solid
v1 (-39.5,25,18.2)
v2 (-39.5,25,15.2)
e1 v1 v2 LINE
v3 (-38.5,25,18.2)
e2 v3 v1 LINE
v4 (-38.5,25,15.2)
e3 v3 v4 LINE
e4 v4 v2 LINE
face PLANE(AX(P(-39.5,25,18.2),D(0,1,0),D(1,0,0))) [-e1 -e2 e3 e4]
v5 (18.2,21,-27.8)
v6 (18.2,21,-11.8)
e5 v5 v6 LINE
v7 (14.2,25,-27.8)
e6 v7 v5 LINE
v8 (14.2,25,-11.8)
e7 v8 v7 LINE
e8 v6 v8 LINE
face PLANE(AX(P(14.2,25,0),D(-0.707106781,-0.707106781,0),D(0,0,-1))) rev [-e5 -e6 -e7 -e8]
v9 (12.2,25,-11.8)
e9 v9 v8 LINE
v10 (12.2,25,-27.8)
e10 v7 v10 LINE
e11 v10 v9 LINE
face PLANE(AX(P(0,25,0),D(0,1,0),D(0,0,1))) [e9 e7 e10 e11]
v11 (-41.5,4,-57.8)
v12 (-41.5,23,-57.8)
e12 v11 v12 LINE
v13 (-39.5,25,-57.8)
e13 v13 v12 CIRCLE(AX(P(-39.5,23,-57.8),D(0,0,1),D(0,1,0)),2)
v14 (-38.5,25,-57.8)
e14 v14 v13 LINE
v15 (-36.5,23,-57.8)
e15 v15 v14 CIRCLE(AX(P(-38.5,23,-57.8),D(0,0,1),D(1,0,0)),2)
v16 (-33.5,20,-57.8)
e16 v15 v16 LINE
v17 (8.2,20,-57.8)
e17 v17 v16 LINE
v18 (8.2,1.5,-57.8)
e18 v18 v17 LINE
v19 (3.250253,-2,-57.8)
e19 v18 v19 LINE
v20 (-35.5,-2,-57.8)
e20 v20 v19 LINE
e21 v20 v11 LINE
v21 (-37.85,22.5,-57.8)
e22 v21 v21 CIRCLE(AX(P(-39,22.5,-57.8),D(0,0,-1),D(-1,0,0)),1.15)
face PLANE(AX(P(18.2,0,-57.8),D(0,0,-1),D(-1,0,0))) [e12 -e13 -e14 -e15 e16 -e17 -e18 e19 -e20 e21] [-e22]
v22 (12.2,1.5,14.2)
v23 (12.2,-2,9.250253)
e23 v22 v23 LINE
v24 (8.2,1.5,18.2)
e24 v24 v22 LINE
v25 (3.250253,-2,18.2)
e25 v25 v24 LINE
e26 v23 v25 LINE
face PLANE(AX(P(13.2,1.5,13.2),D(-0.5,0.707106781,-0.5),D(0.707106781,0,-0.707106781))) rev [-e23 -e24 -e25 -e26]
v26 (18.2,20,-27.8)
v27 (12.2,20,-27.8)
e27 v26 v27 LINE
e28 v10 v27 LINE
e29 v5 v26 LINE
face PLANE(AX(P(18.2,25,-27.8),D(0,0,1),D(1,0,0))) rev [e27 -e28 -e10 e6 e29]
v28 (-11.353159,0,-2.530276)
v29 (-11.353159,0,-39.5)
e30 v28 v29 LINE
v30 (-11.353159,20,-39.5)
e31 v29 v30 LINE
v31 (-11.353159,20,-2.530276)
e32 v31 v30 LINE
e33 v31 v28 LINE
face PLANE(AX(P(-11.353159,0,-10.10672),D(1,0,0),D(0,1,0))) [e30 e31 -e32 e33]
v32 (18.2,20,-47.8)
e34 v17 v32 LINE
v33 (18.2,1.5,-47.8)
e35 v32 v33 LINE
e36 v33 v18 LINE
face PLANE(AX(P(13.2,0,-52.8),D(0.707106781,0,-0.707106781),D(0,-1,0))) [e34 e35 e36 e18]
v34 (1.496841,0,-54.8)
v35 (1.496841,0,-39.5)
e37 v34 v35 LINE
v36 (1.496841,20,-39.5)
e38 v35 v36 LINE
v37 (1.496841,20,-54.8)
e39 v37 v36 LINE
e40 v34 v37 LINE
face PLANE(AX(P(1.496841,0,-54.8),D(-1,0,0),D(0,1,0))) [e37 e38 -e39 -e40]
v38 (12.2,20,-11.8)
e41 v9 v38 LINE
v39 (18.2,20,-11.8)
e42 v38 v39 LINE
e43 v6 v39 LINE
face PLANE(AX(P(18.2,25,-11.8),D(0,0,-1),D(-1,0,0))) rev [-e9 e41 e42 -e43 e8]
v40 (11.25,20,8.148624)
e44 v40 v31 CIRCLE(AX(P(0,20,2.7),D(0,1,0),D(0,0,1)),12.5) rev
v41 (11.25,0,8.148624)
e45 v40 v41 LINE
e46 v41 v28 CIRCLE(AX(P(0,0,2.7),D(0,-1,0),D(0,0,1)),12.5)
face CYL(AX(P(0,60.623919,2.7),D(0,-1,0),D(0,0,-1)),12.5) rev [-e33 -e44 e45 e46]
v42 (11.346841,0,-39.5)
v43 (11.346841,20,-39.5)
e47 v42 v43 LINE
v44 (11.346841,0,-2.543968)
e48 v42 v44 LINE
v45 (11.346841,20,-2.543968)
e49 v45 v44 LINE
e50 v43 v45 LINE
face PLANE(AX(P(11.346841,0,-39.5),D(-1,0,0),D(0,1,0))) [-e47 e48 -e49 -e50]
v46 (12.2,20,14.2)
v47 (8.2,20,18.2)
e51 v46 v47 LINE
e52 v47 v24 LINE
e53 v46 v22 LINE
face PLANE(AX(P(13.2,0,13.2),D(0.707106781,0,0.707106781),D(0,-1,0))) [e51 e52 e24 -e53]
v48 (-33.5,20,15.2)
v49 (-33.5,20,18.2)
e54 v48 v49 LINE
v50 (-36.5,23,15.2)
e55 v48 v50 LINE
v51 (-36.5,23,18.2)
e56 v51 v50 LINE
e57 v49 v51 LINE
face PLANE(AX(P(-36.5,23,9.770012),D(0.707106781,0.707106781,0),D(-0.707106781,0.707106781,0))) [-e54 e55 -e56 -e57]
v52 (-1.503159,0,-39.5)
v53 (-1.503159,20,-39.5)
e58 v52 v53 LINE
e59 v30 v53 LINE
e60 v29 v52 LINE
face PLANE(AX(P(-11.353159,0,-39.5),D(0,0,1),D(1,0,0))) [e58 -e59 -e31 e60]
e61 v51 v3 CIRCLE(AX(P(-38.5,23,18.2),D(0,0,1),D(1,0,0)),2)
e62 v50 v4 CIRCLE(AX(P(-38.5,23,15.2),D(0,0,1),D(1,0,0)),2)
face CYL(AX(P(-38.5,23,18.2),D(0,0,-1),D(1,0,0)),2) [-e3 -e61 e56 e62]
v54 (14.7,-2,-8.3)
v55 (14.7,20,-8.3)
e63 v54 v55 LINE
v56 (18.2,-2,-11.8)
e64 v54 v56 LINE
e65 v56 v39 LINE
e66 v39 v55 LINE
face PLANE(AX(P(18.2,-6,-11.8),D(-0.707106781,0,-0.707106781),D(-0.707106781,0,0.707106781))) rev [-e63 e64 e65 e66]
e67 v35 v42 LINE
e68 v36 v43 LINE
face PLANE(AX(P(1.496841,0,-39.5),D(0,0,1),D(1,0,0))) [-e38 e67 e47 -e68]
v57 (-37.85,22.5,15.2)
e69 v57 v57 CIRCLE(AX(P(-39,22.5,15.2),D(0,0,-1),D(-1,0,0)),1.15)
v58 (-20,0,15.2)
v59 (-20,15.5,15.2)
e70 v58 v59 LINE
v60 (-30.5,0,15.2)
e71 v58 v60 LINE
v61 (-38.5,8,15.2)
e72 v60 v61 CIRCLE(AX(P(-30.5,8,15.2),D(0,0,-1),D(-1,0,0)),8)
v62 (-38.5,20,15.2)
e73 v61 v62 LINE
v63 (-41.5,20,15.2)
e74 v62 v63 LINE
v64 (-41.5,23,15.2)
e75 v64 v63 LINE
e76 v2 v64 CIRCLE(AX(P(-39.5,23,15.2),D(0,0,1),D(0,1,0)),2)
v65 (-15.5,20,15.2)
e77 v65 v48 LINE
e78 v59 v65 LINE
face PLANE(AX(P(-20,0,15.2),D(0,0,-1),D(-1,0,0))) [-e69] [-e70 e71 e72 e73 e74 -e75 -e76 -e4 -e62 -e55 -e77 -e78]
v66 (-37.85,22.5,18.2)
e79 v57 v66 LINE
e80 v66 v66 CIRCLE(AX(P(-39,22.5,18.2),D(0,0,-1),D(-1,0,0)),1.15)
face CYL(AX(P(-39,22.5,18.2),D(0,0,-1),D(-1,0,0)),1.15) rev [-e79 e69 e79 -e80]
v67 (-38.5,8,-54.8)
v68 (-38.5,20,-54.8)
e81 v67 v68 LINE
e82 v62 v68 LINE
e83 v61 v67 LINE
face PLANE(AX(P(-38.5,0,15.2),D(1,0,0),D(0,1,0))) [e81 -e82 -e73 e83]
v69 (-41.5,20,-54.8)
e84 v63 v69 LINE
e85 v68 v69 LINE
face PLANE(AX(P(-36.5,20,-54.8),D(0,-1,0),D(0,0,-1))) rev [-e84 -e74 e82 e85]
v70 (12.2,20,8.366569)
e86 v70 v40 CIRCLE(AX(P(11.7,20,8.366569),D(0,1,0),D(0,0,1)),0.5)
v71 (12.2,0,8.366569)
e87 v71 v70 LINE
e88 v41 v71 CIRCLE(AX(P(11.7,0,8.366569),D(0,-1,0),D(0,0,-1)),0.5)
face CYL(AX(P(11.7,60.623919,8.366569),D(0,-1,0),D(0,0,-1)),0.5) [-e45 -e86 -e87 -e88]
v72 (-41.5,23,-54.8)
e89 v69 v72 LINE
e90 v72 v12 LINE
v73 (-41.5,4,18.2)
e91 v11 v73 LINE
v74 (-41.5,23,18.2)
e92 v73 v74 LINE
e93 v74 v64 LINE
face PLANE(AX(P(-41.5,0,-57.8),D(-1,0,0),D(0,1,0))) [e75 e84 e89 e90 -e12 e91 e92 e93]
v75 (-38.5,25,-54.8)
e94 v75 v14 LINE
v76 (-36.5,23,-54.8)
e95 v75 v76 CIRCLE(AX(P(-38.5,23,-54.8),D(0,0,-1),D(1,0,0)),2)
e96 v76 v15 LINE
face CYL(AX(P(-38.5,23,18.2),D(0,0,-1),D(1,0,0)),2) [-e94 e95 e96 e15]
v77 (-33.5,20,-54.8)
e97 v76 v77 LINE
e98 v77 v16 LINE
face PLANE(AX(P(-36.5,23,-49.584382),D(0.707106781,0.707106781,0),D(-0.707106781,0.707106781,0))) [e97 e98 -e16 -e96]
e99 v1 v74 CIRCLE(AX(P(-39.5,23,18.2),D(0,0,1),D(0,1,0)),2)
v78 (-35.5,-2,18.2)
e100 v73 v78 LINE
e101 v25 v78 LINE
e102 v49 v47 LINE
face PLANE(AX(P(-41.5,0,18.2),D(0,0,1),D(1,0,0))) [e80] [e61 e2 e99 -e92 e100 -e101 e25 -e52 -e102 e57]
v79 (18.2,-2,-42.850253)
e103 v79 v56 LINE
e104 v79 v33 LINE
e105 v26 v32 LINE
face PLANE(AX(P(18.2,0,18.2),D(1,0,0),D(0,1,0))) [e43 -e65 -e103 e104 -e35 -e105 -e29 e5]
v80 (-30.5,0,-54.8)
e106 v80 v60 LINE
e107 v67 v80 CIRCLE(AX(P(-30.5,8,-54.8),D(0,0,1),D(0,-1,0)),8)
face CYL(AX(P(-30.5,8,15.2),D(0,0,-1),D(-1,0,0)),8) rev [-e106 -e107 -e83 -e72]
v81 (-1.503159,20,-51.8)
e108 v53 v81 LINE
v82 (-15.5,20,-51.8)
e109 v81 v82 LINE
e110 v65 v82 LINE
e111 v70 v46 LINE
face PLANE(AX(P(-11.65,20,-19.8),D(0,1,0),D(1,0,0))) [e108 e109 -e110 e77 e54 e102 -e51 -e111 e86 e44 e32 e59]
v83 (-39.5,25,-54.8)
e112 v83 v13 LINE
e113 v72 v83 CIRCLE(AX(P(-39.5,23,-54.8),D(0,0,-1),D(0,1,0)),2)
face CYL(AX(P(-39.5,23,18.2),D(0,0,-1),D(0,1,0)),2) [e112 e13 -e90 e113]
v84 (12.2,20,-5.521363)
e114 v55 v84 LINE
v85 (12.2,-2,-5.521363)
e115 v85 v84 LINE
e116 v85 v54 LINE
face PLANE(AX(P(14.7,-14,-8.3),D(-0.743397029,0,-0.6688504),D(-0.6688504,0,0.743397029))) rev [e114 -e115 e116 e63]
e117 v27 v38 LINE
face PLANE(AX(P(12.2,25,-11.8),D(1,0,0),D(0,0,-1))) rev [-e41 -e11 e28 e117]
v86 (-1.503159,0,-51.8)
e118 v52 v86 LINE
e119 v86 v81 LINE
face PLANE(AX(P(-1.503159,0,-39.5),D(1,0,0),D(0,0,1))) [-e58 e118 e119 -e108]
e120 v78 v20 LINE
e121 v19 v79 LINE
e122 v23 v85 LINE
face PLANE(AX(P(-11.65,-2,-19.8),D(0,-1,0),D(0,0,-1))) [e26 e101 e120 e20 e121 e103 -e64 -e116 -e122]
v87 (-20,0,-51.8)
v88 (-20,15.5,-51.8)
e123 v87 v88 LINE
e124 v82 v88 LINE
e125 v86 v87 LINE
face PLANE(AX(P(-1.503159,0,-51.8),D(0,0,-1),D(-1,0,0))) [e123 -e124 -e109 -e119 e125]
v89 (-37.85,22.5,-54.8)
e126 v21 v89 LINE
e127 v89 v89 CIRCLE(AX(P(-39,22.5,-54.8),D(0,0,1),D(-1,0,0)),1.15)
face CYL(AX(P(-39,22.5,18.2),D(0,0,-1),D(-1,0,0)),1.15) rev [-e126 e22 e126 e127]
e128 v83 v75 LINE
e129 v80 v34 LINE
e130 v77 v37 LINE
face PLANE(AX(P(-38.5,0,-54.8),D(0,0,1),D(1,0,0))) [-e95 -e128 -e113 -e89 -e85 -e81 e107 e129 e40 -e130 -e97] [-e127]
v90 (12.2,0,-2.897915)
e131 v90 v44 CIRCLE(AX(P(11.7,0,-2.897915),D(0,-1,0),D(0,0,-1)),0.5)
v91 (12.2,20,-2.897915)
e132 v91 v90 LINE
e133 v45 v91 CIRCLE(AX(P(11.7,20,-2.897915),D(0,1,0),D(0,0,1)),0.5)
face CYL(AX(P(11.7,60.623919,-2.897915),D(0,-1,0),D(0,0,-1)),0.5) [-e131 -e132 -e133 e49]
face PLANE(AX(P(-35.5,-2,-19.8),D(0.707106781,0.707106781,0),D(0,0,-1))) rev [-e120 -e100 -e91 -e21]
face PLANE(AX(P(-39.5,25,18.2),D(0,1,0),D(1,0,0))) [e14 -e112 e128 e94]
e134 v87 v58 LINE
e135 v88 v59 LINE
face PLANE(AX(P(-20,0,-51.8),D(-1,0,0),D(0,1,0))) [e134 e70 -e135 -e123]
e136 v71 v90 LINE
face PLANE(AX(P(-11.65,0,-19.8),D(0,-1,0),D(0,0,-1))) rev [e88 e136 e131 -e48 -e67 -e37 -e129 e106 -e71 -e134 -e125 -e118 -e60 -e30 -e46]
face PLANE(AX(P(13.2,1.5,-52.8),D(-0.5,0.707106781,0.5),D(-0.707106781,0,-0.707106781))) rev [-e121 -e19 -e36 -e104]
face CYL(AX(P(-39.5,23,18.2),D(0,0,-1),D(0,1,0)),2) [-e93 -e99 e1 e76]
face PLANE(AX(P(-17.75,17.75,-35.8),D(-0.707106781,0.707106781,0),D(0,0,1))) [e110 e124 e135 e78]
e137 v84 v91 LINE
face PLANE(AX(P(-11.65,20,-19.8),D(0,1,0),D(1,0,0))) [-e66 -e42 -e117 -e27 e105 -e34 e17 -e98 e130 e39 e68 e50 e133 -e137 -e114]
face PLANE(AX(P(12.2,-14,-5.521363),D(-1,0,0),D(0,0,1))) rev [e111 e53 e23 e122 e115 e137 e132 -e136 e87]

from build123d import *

# Parameters (mm, degrees)
BOSS_EXTRUDE1_START       = 10
SKETCH1_R                 = 1.15
BOSS_EXTRUDE1_DEPTH       = 76
SKETCH2_W                 = 6
SKETCH2_H                 = 16.4
CUT_EXTRUDE1_DEPTH        = 76
BOSS_EXTRUDE2_START       = -47.8
BOSS_EXTRUDE2_DEPTH       = 37.686187853
BOSS_EXTRUDE2_START_2     = -51.8
BOSS_EXTRUDE2_2_OUTLINE_W = 9.85
BOSS_EXTRUDE2_2_OUTLINE_H = 20
BOSS_EXTRUDE2_2_DEPTH     = 12.300000091
BOSS_EXTRUDE2_START_3     = -57.8
BOSS_EXTRUDE2_3_OUTLINE_R = 1.15
BOSS_EXTRUDE2_3_DEPTH     = 3
BOSS_EXTRUDE2_START_4     = 15.2
BOSS_EXTRUDE2_4_OUTLINE_R = 1.15
BOSS_EXTRUDE2_4_DEPTH     = 3
BOSS_EXTRUDE2_START_5     = -27.8
BOSS_EXTRUDE2_5_OUTLINE_W = 6
BOSS_EXTRUDE2_5_OUTLINE_H = 5
BOSS_EXTRUDE2_5_DEPTH     = 16
BOSS_EXTRUDE2_START_6     = -11.8
BOSS_EXTRUDE2_6_DEPTH     = 1.69328026
BOSS_EXTRUDE2_START_7     = -2
BOSS_EXTRUDE2_7_OUTLINE_W = 3
BOSS_EXTRUDE2_7_OUTLINE_H = 10
BOSS_EXTRUDE2_7_DEPTH     = 22
BOSS_EXTRUDE2_8_DEPTH     = 2
BOSS_EXTRUDE2_START_8     = -39.951533137
BOSS_EXTRUDE2_9_OUTLINE_W = 10
BOSS_EXTRUDE2_9_OUTLINE_H = 25.30671974
BOSS_EXTRUDE2_9_DEPTH     = 14.849242405
CHAMFER1_SIZE             = 10
CHAMFER2_SIZE             = 4
CHAMFER3_SIZE             = 4
SKETCH4_W                 = 5
SKETCH4_H                 = 3.2
CUT_EXTRUDE2_DEPTH        = 17
SKETCH5_W                 = 92.220715814
SKETCH5_H                 = 108.753281114
CUT_EXTRUDE3_DEPTH        = 17
BOSS_EXTRUDE3_DEPTH       = 3
BOSS_EXTRUDE4_DEPTH       = 3
CUT_EXTRUDE5_DEPTH        = 26
FILLET1_R                 = 0.5
FILLET2_R                 = 8
CHAMFER4_SIZE             = 6
CHAMFER6_SIZE             = 3.5
BOSS_EXTRUDE6_DEPTH       = 20
CUT_EXTRUDE10_DEPTH       = 34
SKETCH14_W                = 6.88450438
SKETCH14_H                = 12.178080633
CUT_EXTRUDE11_DEPTH       = 5
FILLET3_R                 = 0.5


with BuildPart() as part:
    # Sketch1 → Boss-Extrude1 (new body)
    with BuildSketch(Plane(origin=(0, 0, -57.8), x_dir=(-1, 0, 0), z_dir=(0, 0, -1)).offset(BOSS_EXTRUDE1_START)):
        with BuildLine():
            Line((39, 25), (-18.2, 25))
            Line((-18.2, 25), (-18.2, 20))
            Line((-18.2, 20), (39, 20))
            ThreePointArc((39, 20), (41.5, 22.5), (39, 25))
        make_face()
        with Locations((39, 22.5)):
            Circle(SKETCH1_R, mode=Mode.SUBTRACT)
    extrude(amount=BOSS_EXTRUDE1_DEPTH)

    # Sketch2 → Cut-Extrude1 (cut)
    with BuildSketch(Plane(origin=(0, 25, 0), x_dir=(1, 0, 0), z_dir=(0, 1, 0))):
        with Locations((15.2, 105.8)):
            Rectangle(SKETCH2_W, SKETCH2_H)
    extrude(amount=-CUT_EXTRUDE1_DEPTH, mode=Mode.SUBTRACT)

    # Chamfer1
    chamfer1_edges = [part.edges().sort_by_distance(p)[0] for p in [
        (18.2, 22.5, -143.8),
        (18.2, 22.5, -67.8),
    ]]
    chamfer(chamfer1_edges, length=CHAMFER1_SIZE)

    # Chamfer2
    chamfer2_edges = [part.edges().sort_by_distance(p)[0] for p in [
        (18.2, 25, -87.7),
        (18.2, 25, -123.9),
    ]]
    chamfer(chamfer2_edges, length=CHAMFER2_SIZE)

    # Sketch4 → Cut-Extrude2 (cut)
    with BuildSketch(Plane(origin=(0, 25, 0), x_dir=(1, 0, 0), z_dir=(0, 1, 0))):
        with Locations((-39, 69.4)):
            Rectangle(SKETCH4_W, SKETCH4_H)
        with Locations((-39, 142.2)):
            Rectangle(SKETCH4_W, SKETCH4_H)
    extrude(amount=-CUT_EXTRUDE2_DEPTH, mode=Mode.SUBTRACT)

    # Sketch5 → Cut-Extrude3 (cut)
    with BuildSketch(Plane(origin=(0, 25, 0), x_dir=(1, 0, 0), z_dir=(0, 1, 0))):
        with Locations((-7.000216009, 117.176640557)):
            Rectangle(SKETCH5_W, SKETCH5_H)
    extrude(amount=-CUT_EXTRUDE3_DEPTH, mode=Mode.SUBTRACT)


with BuildPart() as body_2:
    # Boss-Extrude2: read off the stored shape, not the designer's step
    # Boss-Extrude2 outline → Boss-Extrude2 (new body)
    with BuildSketch(Plane.XY.offset(BOSS_EXTRUDE2_START)):
        Polygon((18.2, -2), (18.2, 20), (11.34684114, 20), (11.34684114, 0), (-11.35315886, 0), (-11.35315886, 20), (-15.5, 20), (-20, 15.5), (-20, 0), (-38.5, 0), (-38.5, 20), (-41.5, 20), (-41.5, -2), align=None)
    extrude(amount=BOSS_EXTRUDE2_DEPTH)

    # Boss-Extrude2 2 outline → Boss-Extrude2 2 (add)
    with BuildSketch(Plane.XY.offset(BOSS_EXTRUDE2_START_2)):
        with Locations((6.42184114, 10)):
            Rectangle(BOSS_EXTRUDE2_2_OUTLINE_W, BOSS_EXTRUDE2_2_OUTLINE_H)
        Polygon((-1.50315886, 0), (-1.50315886, 20), (-15.5, 20), (-20, 15.5), (-20, 0), align=None)
    extrude(amount=BOSS_EXTRUDE2_2_DEPTH)

    # Boss-Extrude2 5 outline → Boss-Extrude2 5 (add)
    with BuildSketch(Plane.XY.offset(BOSS_EXTRUDE2_START_5)):
        with Locations((15.2, 22.5)):
            Rectangle(BOSS_EXTRUDE2_5_OUTLINE_W, BOSS_EXTRUDE2_5_OUTLINE_H)
    extrude(amount=BOSS_EXTRUDE2_5_DEPTH)

    # Boss-Extrude2 6 outline → Boss-Extrude2 6 (add)
    with BuildSketch(Plane.XY.offset(BOSS_EXTRUDE2_START_6)):
        Polygon((-11.35315886, 0), (-11.35315886, 20), (-15.5, 20), (-20, 15.5), (-20, 0), align=None)
    extrude(amount=BOSS_EXTRUDE2_6_DEPTH)



with BuildPart() as body_3:
    # Boss-Extrude2 3 outline → Boss-Extrude2 3 (new body)
    with BuildSketch(Plane.XY.offset(BOSS_EXTRUDE2_START_3)):
        with BuildLine():
            Line((1.49684114, 0), (1.49684114, 20))
            Line((1.49684114, 20), (-36.5, 20))
            Line((-36.5, 20), (-36.5, 23))
            ThreePointArc((-36.5, 23), (-37.085786438, 24.414213562), (-38.5, 25))
            Line((-38.5, 25), (-39.5, 25))
            ThreePointArc((-39.5, 25), (-40.914213562, 24.414213562), (-41.5, 23))
            Line((-41.5, 23), (-41.5, 20))
            Line((-41.5, 20), (-38.5, 20))
            Line((-38.5, 20), (-38.5, 0))
            Line((-38.5, 0), (1.49684114, 0))
        make_face()
        with Locations((-39, 22.5)):
            Circle(BOSS_EXTRUDE2_3_OUTLINE_R, mode=Mode.SUBTRACT)
    extrude(amount=BOSS_EXTRUDE2_3_DEPTH)


with BuildPart() as body_4:
    # Boss-Extrude2 4 outline → Boss-Extrude2 4 (new body)
    with BuildSketch(Plane.XY.offset(BOSS_EXTRUDE2_START_4)):
        with BuildLine():
            Line((1.49684114, 0), (1.49684114, 20))
            Line((1.49684114, 20), (-36.5, 20))
            Line((-36.5, 20), (-36.5, 23))
            ThreePointArc((-36.5, 23), (-37.085786438, 24.414213562), (-38.5, 25))
            Line((-38.5, 25), (-39.5, 25))
            ThreePointArc((-39.5, 25), (-40.914213562, 24.414213562), (-41.5, 23))
            Line((-41.5, 23), (-41.5, 20))
            Line((-41.5, 20), (-38.5, 20))
            Line((-38.5, 20), (-38.5, 0))
            Line((-38.5, 0), (1.49684114, 0))
        make_face()
        with Locations((-39, 22.5)):
            Circle(BOSS_EXTRUDE2_4_OUTLINE_R, mode=Mode.SUBTRACT)
    extrude(amount=BOSS_EXTRUDE2_4_DEPTH)


with BuildPart() as body_2_1:
    add(body_2.part)

    add(body_3.part)  # Boss-Extrude2 7 merges body 3

    add(body_4.part)  # Boss-Extrude2 7 merges body 4
    # Boss-Extrude2 7 outline → Boss-Extrude2 7 (add)
    with BuildSketch(Plane(origin=(0, 0, 0), x_dir=(1, 0, 0), z_dir=(0, 1, 0)).offset(BOSS_EXTRUDE2_START_7)):
        Polygon((18.2, 47.8), (8.2, 57.8), (1.49684114, 57.8), (1.49684114, 47.8), align=None)
        with BuildLine():
            Line((18.2, -8.2), (18.2, 10.113812147))
            Line((18.2, 10.113812147), (11.34684114, 10.113812147))
            ThreePointArc((11.34684114, 10.113812147), (0.0047491, -15.199999258), (-11.35315886, 10.10671974))
            Line((-11.35315886, 10.10671974), (-20, 10.10671974))
            Line((-20, 10.10671974), (-20, -15.2))
            Line((-20, -15.2), (-38.5, -15.2))
            Line((-38.5, -15.2), (-38.5, 10.113812147))
            Line((-38.5, 10.113812147), (-41.5, 10.113812147))
            Line((-41.5, 10.113812147), (-41.5, -18.2))
            Line((-41.5, -18.2), (8.2, -18.2))
            Line((8.2, -18.2), (18.2, -8.2))
        make_face()
        with Locations((-40, 52.8)):
            Rectangle(BOSS_EXTRUDE2_7_OUTLINE_W, BOSS_EXTRUDE2_7_OUTLINE_H)
    extrude(amount=BOSS_EXTRUDE2_7_DEPTH)

    # Boss-Extrude2 8 outline → Boss-Extrude2 8 (add)
    with BuildSketch(Plane(origin=(0, 0, 0), x_dir=(1, 0, 0), z_dir=(0, 1, 0)).offset(BOSS_EXTRUDE2_START_7)):
        Polygon((1.49684114, 47.8), (1.49684114, 57.8), (-38.5, 57.8), (-38.5, 47.8), (-20, 47.8), align=None)
        with BuildLine():
            Line((11.34684114, 10.113812147), (-38.5, 10.113812147))
            Line((-38.5, 10.113812147), (-38.5, -15.2))
            Line((-38.5, -15.2), (-20, -15.2))
            Line((-20, -15.2), (-20, 10.10671974))
            Line((-20, 10.10671974), (-11.35315886, 10.10671974))
            ThreePointArc((-11.35315886, 10.10671974), (0.0047491, -15.199999258), (11.34684114, 10.113812147))
        make_face()
    extrude(amount=BOSS_EXTRUDE2_8_DEPTH)

    # Boss-Extrude2 9 outline → Boss-Extrude2 9 (cut)
    with BuildSketch(Plane(origin=(0, 0, 0), x_dir=(0.7071067811865474, 0.7071067811865477, 0), z_dir=(0.7071067811865476, -0.7071067811865476, 0)).offset(BOSS_EXTRUDE2_START_8)):
        with Locations((0, 2.54664013)):
            Rectangle(BOSS_EXTRUDE2_9_OUTLINE_W, BOSS_EXTRUDE2_9_OUTLINE_H)
    extrude(amount=BOSS_EXTRUDE2_9_DEPTH, mode=Mode.SUBTRACT)

    # Chamfer3
    chamfer3_edges = [body_2_1.edges().sort_by_distance(p)[0] for p in [
        (18.2, 25, -19.8),
    ]]
    chamfer(chamfer3_edges, length=CHAMFER3_SIZE)

    # Sketch6 → Boss-Extrude3 (add)
    with BuildSketch(Plane.XY.offset(18.2)):
        Polygon((-36.5, 23), (-33.5, 20), (-37.431383681, 19.25446979), align=None)
    extrude(amount=-BOSS_EXTRUDE3_DEPTH)

    # Sketch7 → Boss-Extrude4 (add)
    with BuildSketch(Plane(origin=(0, 0, -57.8), x_dir=(-1, 0, 0), z_dir=(0, 0, -1))):
        Polygon((36.5, 23), (33.5, 20), (37.220279648, 19.344567212), align=None)
    extrude(amount=-BOSS_EXTRUDE4_DEPTH)

    # Sketch8 → Cut-Extrude5 (cut)
    with BuildSketch(Plane(origin=(0, 20, 0), x_dir=(1, 0, 0), z_dir=(0, 1, 0))):
        Polygon((18.2, 11.8), (14.7, 8.3), (14.7, -21.501109559), (24.075722879, -13.334137275), (24.580871836, 10.828821177), align=None)
    extrude(amount=-CUT_EXTRUDE5_DEPTH, mode=Mode.SUBTRACT)

    # Fillet1
    fillet1_edges = [body_2_1.edges().sort_by_distance(p)[0] for p in [
        (14.7, 10, -3.866522986),
        (14.7, 10, 3.866522986),
    ]]
    fillet(fillet1_edges, radius=FILLET1_R)

    # Fillet2
    fillet2_edges = [body_2_1.edges().sort_by_distance(p)[0] for p in [
        (-38.5, 0, -19.8),
    ]]
    fillet(fillet2_edges, radius=FILLET2_R)

    # Chamfer4
    chamfer4_edges = [body_2_1.edges().sort_by_distance(p)[0] for p in [
        (-41.5, -2, -19.8),
    ]]
    chamfer(chamfer4_edges, length=CHAMFER4_SIZE)

    # Chamfer6
    chamfer6_edges = [body_2_1.edges().sort_by_distance(p)[0] for p in [
        (13.2, -2, -52.8),
        (11.45, -2, 14.95),
    ]]
    chamfer(chamfer6_edges, length=CHAMFER6_SIZE)

    # Sketch12 → Boss-Extrude6 (add)
    with BuildSketch(Plane(origin=(0, 0, 0), x_dir=(1, 0, 0), z_dir=(0, 1, 0))):
        with BuildLine():
            Line((0, -16.836473334), (-10.35781432, -16.574633061))
            Line((-10.35781432, -16.574633061), (-15.5, -4.91441497))
            Line((-15.5, -4.91441497), (-15.5, 9.8))
            Line((-15.5, 9.8), (-11.35315886, 10.10671974))
            Line((-11.35315886, 10.10671974), (-11.35315886, 2.5302757))
            ThreePointArc((-11.35315886, 2.5302757), (0.007539589, -15.199997726), (11.34684114, 2.543967596))
            Line((11.34684114, 2.543967596), (11.34684114, 10.113812147))
            Line((11.34684114, 10.113812147), (14.7, 8.3))
            Line((14.7, 8.3), (14.7, -11.7))
            Line((14.7, -11.7), (4.492447971, -17.057179979))
            Line((4.492447971, -17.057179979), (0, -16.836473334))
        make_face()
    extrude(amount=BOSS_EXTRUDE6_DEPTH)

    # Sketch13 → Cut-Extrude10 (cut)
    with BuildSketch(Plane(origin=(0, 20, 0), x_dir=(1, 0, 0), z_dir=(0, 1, 0))):
        Polygon((14.7, 8.3), (12.2, 5.521362845), (12.2, -21.090159973), (18.418004591, -14.179128538), align=None)
    extrude(amount=-CUT_EXTRUDE10_DEPTH, mode=Mode.SUBTRACT)

    # Sketch14 → Cut-Extrude11 (cut)
    with BuildSketch(Plane(origin=(6.069669914, -8.583809512, 6.069669914), x_dir=(0.8660254037844393, 0.40824829046386313, -0.28867513459481114), z_dir=(0.49999999999999906, -0.7071067811865493, 0.49999999999999833))):
        with Locations((7.600391897, 9.638669458)):
            Rectangle(SKETCH14_W, SKETCH14_H)
    extrude(amount=CUT_EXTRUDE11_DEPTH, mode=Mode.SUBTRACT)

    # Fillet3
    # the kernel refuses this fillet: 0.5 mm, written as the material it takes off along each edge
    with BuildSketch(Plane(origin=(12.2, 27.361092772, 5.422131518), x_dir=(0, 0, 1), z_dir=(0, -1, 0))) as fillet3_piece_1:
        with BuildLine():
            CenterArc((2.944437109, 0.5), FILLET3_R, 115.841932763, 154.158067237)
            ThreePointArc((2.726492162, 0.95), (1.39076711, 0.396014873), (0, 0))
            Line((0, 0), (2.944437109, 0))
        make_face()
    extrude(amount=27.361092772, mode=Mode.SUBTRACT)
    with BuildSketch(Plane(origin=(12.2, 27.189458898, -0.022131518), x_dir=(0, 0, -1), z_dir=(0, -1, 0))) as fillet3_piece_2:
        with BuildLine():
            CenterArc((2.875783559, -0.5), FILLET3_R, 90, 134.936099196)
            ThreePointArc((2.521836078, -0.85315886), (1.28369596, -0.359250606), (0, 0))
            Line((0, 0), (2.875783559, 0))
        make_face()
    extrude(amount=27.189458898, mode=Mode.SUBTRACT)


solid = body_2_1.part
